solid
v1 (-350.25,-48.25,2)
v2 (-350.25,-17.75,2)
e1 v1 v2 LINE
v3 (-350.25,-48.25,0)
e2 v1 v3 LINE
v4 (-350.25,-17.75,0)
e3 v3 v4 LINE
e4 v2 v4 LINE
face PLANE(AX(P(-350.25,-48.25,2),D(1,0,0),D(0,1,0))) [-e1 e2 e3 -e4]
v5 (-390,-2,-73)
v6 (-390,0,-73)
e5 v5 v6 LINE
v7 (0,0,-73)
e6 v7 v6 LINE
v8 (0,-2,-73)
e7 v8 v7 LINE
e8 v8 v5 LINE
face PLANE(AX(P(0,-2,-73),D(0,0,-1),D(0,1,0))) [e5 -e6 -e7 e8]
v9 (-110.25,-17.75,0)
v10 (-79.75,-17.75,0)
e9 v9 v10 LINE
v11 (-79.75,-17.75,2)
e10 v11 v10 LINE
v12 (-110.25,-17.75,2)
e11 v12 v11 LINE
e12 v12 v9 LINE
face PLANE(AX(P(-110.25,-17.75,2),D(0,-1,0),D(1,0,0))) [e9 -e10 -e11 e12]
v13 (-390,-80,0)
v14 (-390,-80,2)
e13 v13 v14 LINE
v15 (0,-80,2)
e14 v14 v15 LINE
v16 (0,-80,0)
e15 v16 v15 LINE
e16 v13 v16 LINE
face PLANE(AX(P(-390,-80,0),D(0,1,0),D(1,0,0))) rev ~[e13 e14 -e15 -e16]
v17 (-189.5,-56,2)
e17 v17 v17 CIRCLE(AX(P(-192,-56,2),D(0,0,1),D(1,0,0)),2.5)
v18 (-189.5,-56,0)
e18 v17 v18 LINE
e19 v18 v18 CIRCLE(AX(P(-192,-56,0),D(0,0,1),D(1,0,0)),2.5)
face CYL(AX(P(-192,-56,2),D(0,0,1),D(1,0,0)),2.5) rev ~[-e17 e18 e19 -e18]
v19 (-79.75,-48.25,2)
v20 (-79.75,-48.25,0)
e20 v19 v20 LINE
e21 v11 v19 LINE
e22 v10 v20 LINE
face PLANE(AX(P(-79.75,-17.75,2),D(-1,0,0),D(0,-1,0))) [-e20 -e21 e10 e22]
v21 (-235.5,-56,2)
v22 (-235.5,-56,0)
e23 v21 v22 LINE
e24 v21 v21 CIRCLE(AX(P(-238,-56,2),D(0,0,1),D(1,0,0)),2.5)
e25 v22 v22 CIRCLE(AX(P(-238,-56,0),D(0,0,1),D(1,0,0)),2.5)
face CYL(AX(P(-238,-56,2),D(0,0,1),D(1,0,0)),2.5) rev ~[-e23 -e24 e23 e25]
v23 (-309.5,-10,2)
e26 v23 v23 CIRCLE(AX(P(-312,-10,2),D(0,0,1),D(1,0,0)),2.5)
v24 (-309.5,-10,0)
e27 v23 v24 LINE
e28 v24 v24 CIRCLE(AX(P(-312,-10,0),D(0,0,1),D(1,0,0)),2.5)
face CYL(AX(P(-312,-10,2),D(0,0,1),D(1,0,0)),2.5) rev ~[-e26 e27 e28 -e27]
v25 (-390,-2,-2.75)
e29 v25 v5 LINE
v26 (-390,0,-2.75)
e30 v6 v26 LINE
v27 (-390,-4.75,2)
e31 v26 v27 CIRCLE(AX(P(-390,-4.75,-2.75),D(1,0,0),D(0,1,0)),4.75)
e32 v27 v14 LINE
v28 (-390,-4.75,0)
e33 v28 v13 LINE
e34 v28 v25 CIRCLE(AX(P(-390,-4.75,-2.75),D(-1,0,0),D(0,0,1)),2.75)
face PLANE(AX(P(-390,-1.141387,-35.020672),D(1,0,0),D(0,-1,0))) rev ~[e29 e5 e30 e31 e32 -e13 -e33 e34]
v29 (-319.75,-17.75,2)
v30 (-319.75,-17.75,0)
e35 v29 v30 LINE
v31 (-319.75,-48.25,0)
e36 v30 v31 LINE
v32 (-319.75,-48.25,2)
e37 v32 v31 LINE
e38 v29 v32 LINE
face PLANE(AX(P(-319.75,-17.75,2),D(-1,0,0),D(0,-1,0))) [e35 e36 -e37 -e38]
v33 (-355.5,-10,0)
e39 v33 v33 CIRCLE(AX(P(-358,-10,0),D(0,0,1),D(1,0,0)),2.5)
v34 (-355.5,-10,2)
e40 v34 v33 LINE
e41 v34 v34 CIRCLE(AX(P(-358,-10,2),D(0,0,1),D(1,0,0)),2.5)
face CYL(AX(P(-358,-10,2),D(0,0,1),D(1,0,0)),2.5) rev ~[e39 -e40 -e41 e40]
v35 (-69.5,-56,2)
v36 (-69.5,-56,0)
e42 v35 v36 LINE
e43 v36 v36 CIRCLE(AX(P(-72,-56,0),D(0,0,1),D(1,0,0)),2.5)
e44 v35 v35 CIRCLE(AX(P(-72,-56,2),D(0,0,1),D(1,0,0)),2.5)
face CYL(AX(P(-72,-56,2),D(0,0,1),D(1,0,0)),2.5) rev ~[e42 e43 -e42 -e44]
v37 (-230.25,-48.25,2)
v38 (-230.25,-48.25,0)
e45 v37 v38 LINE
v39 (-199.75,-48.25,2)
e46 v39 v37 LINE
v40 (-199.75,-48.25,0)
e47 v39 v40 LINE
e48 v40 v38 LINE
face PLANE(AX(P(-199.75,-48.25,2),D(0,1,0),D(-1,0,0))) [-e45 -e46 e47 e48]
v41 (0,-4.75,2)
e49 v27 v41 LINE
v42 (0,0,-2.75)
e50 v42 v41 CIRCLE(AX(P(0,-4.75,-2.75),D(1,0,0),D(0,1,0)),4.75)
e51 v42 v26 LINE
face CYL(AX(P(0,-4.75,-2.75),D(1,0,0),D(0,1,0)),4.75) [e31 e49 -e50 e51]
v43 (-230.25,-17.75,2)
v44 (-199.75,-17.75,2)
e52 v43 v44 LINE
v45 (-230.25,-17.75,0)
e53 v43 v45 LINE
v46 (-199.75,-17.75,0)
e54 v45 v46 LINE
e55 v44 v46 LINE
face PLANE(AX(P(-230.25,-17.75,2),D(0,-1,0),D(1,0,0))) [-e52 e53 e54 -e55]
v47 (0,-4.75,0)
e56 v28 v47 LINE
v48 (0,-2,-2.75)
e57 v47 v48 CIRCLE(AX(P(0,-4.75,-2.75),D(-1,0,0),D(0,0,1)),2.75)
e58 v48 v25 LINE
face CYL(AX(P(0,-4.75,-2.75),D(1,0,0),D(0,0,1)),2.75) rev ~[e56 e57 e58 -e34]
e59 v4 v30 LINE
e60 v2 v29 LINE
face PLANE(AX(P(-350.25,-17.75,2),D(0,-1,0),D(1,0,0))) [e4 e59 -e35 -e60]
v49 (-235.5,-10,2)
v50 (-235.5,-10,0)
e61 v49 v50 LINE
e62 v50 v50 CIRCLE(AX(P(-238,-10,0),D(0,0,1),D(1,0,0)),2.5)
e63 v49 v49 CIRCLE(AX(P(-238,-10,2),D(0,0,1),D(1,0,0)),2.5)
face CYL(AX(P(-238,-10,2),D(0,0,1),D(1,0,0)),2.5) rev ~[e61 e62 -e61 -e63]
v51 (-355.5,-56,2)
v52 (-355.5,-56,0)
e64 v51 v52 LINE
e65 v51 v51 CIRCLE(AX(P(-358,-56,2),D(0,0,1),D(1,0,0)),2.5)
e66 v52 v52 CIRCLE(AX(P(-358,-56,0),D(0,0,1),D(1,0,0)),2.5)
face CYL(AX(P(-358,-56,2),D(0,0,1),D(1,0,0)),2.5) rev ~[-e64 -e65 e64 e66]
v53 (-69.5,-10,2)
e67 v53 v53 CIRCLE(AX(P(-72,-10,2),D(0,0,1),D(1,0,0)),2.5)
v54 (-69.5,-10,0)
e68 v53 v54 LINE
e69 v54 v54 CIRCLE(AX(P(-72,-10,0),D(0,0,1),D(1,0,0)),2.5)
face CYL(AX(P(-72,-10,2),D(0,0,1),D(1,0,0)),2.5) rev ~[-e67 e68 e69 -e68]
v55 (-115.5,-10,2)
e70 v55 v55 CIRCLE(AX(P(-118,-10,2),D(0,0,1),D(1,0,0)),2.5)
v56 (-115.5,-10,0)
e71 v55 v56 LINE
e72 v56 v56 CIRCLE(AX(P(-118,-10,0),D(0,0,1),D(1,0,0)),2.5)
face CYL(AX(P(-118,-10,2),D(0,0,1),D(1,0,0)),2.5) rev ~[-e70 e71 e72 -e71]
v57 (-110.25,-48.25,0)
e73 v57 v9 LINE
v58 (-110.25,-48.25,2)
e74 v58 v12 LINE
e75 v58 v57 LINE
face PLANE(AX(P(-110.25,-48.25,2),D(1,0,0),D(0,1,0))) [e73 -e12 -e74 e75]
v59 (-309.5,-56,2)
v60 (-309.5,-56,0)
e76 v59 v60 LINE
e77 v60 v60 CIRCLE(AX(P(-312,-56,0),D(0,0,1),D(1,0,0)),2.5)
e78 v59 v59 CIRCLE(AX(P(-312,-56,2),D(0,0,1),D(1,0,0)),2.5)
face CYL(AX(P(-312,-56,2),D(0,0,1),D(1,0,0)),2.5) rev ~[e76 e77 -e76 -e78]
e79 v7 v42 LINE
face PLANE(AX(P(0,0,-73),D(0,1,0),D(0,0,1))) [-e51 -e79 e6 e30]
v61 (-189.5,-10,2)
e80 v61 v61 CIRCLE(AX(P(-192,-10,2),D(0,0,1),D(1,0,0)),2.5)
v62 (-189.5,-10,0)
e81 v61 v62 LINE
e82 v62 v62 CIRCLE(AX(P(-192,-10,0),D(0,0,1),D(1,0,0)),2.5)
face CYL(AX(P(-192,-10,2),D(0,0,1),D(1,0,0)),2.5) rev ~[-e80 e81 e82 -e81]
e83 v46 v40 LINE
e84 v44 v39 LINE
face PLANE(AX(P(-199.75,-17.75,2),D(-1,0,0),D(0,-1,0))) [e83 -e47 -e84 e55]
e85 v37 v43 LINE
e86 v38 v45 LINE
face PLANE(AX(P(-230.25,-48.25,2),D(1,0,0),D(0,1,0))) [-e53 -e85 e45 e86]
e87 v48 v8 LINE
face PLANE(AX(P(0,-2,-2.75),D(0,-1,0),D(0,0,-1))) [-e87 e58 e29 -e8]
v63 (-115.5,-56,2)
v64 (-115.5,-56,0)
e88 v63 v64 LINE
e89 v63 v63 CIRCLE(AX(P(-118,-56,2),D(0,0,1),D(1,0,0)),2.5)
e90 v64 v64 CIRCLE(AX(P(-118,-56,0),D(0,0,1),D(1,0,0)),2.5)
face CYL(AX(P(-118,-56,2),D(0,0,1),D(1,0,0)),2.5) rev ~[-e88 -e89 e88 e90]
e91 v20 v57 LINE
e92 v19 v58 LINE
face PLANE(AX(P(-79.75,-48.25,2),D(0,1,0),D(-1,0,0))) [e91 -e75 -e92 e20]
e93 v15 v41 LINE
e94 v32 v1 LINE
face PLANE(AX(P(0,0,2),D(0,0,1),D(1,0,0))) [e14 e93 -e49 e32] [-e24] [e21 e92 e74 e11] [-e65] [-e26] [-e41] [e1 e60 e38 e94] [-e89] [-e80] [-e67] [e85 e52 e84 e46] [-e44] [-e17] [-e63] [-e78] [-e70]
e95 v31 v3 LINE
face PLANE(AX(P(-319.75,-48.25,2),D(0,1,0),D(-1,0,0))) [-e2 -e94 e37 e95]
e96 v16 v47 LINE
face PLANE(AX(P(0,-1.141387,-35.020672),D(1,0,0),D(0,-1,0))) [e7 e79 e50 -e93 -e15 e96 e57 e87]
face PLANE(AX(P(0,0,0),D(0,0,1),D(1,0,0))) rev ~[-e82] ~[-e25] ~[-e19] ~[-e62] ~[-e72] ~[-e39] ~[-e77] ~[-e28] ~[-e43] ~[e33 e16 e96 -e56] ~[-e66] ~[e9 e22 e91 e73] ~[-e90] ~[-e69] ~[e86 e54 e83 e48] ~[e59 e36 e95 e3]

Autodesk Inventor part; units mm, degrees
ref_plane "YZ Plane" through (0, 0, 0) normal (1, 0, 0) x (0, 1, 0)
ref_plane "XZ Plane" through (0, 0, 0) normal (0, 1, 0) x (-1, 0, 0)
ref_plane "XY Plane" through (0, 0, 0) normal (0, 0, 1) x (1, 0, 0)
sketch "Sketch1" plane through (0, 0, 0) normal (0, 0, 1) x (1, 0, 0)
  line L0 (0, 0) -> (-390, 0)
  line L1 (0, -80) -> (0, 0)
  line L2 (-390, 0) -> (-390, -80)
  line L3 (-390, -80) -> (0, -80)
  point P0 (0, -40)
  dimension "d32" = 80
  dimension "d60" = 80
  dimension "d61" = 390
extrude "Plate1" add sketch "Sketch1" along normal blind 2
sketch "Sketch8" plane through (0, 0, 2) normal (0, 0, 1) x (1, 0, 0)
  line L0 (-79.75, -48.25) -> (-110.25, -48.25)
  line L1 (-110.25, -48.25) -> (-110.25, -17.75)
  line L2 (-110.25, -17.75) -> (-79.75, -17.75)
  line L3 (-79.75, -17.75) -> (-79.75, -48.25)
  line L4 (-79.75, -48.25) -> (-110.25, -17.75) construction
  line L5 (-110.25, -48.25) -> (-79.75, -17.75) construction
  circle A0 centre (-72, -56) radius 2.5
  circle A1 centre (-118, -56) radius 2.5
  circle A2 centre (-118, -10) radius 2.5
  circle A3 centre (-72, -10) radius 2.5
  line L6 (0, 0) -> (0, -80) projected
  line L7 (-390, 0) -> (0, 0) projected
  line L8 (-110.25, -48.25) -> (-118, -56) construction
  line L9 (-118, -10) -> (-72, -10) construction
  line L10 (-72, -10) -> (-72, -56) construction
  line L11 (-72, -56) -> (-118, -56) construction
  line L12 (-118, -56) -> (-118, -10) construction
  point P0 (-95, -33)
  dimension "d51" = 30.5
  dimension "d52" = 30.5
  dimension "d53" = 5
  dimension "d72" = 95
  dimension "d78" = 46
  dimension "d79" = 10
extrude "Cut3" cut sketch "Sketch8" against normal blind 2
pattern_linear "Rectangular Pattern1" count 3 spacing 120 along (-1, 0, 0) of "Cut3"
sketch "Sketch9" plane through (0, -2, 2) normal (0, 1, 0) x (-1, 0, 0)
  line L0 (390, 0) -> (0, 0)
  line L1 (0, 0) -> (0, -75)
  line L2 (0, -75) -> (390, -75)
  line L3 (390, -75) -> (390, 0)
edge flange "Flange3" height 75 angle 90 thickness 2 bend radius 2.75 thickness toward (0, 1, 0) relief round relief width 2 relief depth 1 edges at (-195, 0, 0) wall of the first edge with corners at (-390, -2, 2) (0, -2, 2) (0, -2, -73) (-390, -2, -73)
bend "Bend3"
corner "Corner3"
equation "\"d51\" = d52"
equation "\"d55\" = Thickness"
equation "\"d2\" = Thickness"
equation "\"d62\" = BendReliefWidth"
equation "\"d63\" = BendReliefDepth"
equation "\"d64\" = MinimumRemnant"
equation "\"d65\" = TransitionRadius"
equation "\"d68\" = BendRadius"
equation "\"d69\" = CornerReliefSize"
equation "\"d70\" = GapSize"
equation "\"d71\" = JacobiRadiusSize"
equation "\"BendReliefWidth\" = Thickness"
equation "\"BendReliefDepth\" = 0.5 * Thickness"
equation "\"CornerReliefSize\" = 4 * Thickness"
equation "\"MinimumRemnant\" = 2 * Thickness"
equation "\"TransitionRadius\" = BendRadius"
equation "\"JacobiRadiusSize\" = BendRadius"
equation "\"GapSize\" = Thickness"
equation "\"Thickness\" = 2"
equation "\"BendRadius\" = 2.75"
properties part number "PRS-1422 BOTTOM FDS diameter way up_CPY" material "Stainless Steel"
